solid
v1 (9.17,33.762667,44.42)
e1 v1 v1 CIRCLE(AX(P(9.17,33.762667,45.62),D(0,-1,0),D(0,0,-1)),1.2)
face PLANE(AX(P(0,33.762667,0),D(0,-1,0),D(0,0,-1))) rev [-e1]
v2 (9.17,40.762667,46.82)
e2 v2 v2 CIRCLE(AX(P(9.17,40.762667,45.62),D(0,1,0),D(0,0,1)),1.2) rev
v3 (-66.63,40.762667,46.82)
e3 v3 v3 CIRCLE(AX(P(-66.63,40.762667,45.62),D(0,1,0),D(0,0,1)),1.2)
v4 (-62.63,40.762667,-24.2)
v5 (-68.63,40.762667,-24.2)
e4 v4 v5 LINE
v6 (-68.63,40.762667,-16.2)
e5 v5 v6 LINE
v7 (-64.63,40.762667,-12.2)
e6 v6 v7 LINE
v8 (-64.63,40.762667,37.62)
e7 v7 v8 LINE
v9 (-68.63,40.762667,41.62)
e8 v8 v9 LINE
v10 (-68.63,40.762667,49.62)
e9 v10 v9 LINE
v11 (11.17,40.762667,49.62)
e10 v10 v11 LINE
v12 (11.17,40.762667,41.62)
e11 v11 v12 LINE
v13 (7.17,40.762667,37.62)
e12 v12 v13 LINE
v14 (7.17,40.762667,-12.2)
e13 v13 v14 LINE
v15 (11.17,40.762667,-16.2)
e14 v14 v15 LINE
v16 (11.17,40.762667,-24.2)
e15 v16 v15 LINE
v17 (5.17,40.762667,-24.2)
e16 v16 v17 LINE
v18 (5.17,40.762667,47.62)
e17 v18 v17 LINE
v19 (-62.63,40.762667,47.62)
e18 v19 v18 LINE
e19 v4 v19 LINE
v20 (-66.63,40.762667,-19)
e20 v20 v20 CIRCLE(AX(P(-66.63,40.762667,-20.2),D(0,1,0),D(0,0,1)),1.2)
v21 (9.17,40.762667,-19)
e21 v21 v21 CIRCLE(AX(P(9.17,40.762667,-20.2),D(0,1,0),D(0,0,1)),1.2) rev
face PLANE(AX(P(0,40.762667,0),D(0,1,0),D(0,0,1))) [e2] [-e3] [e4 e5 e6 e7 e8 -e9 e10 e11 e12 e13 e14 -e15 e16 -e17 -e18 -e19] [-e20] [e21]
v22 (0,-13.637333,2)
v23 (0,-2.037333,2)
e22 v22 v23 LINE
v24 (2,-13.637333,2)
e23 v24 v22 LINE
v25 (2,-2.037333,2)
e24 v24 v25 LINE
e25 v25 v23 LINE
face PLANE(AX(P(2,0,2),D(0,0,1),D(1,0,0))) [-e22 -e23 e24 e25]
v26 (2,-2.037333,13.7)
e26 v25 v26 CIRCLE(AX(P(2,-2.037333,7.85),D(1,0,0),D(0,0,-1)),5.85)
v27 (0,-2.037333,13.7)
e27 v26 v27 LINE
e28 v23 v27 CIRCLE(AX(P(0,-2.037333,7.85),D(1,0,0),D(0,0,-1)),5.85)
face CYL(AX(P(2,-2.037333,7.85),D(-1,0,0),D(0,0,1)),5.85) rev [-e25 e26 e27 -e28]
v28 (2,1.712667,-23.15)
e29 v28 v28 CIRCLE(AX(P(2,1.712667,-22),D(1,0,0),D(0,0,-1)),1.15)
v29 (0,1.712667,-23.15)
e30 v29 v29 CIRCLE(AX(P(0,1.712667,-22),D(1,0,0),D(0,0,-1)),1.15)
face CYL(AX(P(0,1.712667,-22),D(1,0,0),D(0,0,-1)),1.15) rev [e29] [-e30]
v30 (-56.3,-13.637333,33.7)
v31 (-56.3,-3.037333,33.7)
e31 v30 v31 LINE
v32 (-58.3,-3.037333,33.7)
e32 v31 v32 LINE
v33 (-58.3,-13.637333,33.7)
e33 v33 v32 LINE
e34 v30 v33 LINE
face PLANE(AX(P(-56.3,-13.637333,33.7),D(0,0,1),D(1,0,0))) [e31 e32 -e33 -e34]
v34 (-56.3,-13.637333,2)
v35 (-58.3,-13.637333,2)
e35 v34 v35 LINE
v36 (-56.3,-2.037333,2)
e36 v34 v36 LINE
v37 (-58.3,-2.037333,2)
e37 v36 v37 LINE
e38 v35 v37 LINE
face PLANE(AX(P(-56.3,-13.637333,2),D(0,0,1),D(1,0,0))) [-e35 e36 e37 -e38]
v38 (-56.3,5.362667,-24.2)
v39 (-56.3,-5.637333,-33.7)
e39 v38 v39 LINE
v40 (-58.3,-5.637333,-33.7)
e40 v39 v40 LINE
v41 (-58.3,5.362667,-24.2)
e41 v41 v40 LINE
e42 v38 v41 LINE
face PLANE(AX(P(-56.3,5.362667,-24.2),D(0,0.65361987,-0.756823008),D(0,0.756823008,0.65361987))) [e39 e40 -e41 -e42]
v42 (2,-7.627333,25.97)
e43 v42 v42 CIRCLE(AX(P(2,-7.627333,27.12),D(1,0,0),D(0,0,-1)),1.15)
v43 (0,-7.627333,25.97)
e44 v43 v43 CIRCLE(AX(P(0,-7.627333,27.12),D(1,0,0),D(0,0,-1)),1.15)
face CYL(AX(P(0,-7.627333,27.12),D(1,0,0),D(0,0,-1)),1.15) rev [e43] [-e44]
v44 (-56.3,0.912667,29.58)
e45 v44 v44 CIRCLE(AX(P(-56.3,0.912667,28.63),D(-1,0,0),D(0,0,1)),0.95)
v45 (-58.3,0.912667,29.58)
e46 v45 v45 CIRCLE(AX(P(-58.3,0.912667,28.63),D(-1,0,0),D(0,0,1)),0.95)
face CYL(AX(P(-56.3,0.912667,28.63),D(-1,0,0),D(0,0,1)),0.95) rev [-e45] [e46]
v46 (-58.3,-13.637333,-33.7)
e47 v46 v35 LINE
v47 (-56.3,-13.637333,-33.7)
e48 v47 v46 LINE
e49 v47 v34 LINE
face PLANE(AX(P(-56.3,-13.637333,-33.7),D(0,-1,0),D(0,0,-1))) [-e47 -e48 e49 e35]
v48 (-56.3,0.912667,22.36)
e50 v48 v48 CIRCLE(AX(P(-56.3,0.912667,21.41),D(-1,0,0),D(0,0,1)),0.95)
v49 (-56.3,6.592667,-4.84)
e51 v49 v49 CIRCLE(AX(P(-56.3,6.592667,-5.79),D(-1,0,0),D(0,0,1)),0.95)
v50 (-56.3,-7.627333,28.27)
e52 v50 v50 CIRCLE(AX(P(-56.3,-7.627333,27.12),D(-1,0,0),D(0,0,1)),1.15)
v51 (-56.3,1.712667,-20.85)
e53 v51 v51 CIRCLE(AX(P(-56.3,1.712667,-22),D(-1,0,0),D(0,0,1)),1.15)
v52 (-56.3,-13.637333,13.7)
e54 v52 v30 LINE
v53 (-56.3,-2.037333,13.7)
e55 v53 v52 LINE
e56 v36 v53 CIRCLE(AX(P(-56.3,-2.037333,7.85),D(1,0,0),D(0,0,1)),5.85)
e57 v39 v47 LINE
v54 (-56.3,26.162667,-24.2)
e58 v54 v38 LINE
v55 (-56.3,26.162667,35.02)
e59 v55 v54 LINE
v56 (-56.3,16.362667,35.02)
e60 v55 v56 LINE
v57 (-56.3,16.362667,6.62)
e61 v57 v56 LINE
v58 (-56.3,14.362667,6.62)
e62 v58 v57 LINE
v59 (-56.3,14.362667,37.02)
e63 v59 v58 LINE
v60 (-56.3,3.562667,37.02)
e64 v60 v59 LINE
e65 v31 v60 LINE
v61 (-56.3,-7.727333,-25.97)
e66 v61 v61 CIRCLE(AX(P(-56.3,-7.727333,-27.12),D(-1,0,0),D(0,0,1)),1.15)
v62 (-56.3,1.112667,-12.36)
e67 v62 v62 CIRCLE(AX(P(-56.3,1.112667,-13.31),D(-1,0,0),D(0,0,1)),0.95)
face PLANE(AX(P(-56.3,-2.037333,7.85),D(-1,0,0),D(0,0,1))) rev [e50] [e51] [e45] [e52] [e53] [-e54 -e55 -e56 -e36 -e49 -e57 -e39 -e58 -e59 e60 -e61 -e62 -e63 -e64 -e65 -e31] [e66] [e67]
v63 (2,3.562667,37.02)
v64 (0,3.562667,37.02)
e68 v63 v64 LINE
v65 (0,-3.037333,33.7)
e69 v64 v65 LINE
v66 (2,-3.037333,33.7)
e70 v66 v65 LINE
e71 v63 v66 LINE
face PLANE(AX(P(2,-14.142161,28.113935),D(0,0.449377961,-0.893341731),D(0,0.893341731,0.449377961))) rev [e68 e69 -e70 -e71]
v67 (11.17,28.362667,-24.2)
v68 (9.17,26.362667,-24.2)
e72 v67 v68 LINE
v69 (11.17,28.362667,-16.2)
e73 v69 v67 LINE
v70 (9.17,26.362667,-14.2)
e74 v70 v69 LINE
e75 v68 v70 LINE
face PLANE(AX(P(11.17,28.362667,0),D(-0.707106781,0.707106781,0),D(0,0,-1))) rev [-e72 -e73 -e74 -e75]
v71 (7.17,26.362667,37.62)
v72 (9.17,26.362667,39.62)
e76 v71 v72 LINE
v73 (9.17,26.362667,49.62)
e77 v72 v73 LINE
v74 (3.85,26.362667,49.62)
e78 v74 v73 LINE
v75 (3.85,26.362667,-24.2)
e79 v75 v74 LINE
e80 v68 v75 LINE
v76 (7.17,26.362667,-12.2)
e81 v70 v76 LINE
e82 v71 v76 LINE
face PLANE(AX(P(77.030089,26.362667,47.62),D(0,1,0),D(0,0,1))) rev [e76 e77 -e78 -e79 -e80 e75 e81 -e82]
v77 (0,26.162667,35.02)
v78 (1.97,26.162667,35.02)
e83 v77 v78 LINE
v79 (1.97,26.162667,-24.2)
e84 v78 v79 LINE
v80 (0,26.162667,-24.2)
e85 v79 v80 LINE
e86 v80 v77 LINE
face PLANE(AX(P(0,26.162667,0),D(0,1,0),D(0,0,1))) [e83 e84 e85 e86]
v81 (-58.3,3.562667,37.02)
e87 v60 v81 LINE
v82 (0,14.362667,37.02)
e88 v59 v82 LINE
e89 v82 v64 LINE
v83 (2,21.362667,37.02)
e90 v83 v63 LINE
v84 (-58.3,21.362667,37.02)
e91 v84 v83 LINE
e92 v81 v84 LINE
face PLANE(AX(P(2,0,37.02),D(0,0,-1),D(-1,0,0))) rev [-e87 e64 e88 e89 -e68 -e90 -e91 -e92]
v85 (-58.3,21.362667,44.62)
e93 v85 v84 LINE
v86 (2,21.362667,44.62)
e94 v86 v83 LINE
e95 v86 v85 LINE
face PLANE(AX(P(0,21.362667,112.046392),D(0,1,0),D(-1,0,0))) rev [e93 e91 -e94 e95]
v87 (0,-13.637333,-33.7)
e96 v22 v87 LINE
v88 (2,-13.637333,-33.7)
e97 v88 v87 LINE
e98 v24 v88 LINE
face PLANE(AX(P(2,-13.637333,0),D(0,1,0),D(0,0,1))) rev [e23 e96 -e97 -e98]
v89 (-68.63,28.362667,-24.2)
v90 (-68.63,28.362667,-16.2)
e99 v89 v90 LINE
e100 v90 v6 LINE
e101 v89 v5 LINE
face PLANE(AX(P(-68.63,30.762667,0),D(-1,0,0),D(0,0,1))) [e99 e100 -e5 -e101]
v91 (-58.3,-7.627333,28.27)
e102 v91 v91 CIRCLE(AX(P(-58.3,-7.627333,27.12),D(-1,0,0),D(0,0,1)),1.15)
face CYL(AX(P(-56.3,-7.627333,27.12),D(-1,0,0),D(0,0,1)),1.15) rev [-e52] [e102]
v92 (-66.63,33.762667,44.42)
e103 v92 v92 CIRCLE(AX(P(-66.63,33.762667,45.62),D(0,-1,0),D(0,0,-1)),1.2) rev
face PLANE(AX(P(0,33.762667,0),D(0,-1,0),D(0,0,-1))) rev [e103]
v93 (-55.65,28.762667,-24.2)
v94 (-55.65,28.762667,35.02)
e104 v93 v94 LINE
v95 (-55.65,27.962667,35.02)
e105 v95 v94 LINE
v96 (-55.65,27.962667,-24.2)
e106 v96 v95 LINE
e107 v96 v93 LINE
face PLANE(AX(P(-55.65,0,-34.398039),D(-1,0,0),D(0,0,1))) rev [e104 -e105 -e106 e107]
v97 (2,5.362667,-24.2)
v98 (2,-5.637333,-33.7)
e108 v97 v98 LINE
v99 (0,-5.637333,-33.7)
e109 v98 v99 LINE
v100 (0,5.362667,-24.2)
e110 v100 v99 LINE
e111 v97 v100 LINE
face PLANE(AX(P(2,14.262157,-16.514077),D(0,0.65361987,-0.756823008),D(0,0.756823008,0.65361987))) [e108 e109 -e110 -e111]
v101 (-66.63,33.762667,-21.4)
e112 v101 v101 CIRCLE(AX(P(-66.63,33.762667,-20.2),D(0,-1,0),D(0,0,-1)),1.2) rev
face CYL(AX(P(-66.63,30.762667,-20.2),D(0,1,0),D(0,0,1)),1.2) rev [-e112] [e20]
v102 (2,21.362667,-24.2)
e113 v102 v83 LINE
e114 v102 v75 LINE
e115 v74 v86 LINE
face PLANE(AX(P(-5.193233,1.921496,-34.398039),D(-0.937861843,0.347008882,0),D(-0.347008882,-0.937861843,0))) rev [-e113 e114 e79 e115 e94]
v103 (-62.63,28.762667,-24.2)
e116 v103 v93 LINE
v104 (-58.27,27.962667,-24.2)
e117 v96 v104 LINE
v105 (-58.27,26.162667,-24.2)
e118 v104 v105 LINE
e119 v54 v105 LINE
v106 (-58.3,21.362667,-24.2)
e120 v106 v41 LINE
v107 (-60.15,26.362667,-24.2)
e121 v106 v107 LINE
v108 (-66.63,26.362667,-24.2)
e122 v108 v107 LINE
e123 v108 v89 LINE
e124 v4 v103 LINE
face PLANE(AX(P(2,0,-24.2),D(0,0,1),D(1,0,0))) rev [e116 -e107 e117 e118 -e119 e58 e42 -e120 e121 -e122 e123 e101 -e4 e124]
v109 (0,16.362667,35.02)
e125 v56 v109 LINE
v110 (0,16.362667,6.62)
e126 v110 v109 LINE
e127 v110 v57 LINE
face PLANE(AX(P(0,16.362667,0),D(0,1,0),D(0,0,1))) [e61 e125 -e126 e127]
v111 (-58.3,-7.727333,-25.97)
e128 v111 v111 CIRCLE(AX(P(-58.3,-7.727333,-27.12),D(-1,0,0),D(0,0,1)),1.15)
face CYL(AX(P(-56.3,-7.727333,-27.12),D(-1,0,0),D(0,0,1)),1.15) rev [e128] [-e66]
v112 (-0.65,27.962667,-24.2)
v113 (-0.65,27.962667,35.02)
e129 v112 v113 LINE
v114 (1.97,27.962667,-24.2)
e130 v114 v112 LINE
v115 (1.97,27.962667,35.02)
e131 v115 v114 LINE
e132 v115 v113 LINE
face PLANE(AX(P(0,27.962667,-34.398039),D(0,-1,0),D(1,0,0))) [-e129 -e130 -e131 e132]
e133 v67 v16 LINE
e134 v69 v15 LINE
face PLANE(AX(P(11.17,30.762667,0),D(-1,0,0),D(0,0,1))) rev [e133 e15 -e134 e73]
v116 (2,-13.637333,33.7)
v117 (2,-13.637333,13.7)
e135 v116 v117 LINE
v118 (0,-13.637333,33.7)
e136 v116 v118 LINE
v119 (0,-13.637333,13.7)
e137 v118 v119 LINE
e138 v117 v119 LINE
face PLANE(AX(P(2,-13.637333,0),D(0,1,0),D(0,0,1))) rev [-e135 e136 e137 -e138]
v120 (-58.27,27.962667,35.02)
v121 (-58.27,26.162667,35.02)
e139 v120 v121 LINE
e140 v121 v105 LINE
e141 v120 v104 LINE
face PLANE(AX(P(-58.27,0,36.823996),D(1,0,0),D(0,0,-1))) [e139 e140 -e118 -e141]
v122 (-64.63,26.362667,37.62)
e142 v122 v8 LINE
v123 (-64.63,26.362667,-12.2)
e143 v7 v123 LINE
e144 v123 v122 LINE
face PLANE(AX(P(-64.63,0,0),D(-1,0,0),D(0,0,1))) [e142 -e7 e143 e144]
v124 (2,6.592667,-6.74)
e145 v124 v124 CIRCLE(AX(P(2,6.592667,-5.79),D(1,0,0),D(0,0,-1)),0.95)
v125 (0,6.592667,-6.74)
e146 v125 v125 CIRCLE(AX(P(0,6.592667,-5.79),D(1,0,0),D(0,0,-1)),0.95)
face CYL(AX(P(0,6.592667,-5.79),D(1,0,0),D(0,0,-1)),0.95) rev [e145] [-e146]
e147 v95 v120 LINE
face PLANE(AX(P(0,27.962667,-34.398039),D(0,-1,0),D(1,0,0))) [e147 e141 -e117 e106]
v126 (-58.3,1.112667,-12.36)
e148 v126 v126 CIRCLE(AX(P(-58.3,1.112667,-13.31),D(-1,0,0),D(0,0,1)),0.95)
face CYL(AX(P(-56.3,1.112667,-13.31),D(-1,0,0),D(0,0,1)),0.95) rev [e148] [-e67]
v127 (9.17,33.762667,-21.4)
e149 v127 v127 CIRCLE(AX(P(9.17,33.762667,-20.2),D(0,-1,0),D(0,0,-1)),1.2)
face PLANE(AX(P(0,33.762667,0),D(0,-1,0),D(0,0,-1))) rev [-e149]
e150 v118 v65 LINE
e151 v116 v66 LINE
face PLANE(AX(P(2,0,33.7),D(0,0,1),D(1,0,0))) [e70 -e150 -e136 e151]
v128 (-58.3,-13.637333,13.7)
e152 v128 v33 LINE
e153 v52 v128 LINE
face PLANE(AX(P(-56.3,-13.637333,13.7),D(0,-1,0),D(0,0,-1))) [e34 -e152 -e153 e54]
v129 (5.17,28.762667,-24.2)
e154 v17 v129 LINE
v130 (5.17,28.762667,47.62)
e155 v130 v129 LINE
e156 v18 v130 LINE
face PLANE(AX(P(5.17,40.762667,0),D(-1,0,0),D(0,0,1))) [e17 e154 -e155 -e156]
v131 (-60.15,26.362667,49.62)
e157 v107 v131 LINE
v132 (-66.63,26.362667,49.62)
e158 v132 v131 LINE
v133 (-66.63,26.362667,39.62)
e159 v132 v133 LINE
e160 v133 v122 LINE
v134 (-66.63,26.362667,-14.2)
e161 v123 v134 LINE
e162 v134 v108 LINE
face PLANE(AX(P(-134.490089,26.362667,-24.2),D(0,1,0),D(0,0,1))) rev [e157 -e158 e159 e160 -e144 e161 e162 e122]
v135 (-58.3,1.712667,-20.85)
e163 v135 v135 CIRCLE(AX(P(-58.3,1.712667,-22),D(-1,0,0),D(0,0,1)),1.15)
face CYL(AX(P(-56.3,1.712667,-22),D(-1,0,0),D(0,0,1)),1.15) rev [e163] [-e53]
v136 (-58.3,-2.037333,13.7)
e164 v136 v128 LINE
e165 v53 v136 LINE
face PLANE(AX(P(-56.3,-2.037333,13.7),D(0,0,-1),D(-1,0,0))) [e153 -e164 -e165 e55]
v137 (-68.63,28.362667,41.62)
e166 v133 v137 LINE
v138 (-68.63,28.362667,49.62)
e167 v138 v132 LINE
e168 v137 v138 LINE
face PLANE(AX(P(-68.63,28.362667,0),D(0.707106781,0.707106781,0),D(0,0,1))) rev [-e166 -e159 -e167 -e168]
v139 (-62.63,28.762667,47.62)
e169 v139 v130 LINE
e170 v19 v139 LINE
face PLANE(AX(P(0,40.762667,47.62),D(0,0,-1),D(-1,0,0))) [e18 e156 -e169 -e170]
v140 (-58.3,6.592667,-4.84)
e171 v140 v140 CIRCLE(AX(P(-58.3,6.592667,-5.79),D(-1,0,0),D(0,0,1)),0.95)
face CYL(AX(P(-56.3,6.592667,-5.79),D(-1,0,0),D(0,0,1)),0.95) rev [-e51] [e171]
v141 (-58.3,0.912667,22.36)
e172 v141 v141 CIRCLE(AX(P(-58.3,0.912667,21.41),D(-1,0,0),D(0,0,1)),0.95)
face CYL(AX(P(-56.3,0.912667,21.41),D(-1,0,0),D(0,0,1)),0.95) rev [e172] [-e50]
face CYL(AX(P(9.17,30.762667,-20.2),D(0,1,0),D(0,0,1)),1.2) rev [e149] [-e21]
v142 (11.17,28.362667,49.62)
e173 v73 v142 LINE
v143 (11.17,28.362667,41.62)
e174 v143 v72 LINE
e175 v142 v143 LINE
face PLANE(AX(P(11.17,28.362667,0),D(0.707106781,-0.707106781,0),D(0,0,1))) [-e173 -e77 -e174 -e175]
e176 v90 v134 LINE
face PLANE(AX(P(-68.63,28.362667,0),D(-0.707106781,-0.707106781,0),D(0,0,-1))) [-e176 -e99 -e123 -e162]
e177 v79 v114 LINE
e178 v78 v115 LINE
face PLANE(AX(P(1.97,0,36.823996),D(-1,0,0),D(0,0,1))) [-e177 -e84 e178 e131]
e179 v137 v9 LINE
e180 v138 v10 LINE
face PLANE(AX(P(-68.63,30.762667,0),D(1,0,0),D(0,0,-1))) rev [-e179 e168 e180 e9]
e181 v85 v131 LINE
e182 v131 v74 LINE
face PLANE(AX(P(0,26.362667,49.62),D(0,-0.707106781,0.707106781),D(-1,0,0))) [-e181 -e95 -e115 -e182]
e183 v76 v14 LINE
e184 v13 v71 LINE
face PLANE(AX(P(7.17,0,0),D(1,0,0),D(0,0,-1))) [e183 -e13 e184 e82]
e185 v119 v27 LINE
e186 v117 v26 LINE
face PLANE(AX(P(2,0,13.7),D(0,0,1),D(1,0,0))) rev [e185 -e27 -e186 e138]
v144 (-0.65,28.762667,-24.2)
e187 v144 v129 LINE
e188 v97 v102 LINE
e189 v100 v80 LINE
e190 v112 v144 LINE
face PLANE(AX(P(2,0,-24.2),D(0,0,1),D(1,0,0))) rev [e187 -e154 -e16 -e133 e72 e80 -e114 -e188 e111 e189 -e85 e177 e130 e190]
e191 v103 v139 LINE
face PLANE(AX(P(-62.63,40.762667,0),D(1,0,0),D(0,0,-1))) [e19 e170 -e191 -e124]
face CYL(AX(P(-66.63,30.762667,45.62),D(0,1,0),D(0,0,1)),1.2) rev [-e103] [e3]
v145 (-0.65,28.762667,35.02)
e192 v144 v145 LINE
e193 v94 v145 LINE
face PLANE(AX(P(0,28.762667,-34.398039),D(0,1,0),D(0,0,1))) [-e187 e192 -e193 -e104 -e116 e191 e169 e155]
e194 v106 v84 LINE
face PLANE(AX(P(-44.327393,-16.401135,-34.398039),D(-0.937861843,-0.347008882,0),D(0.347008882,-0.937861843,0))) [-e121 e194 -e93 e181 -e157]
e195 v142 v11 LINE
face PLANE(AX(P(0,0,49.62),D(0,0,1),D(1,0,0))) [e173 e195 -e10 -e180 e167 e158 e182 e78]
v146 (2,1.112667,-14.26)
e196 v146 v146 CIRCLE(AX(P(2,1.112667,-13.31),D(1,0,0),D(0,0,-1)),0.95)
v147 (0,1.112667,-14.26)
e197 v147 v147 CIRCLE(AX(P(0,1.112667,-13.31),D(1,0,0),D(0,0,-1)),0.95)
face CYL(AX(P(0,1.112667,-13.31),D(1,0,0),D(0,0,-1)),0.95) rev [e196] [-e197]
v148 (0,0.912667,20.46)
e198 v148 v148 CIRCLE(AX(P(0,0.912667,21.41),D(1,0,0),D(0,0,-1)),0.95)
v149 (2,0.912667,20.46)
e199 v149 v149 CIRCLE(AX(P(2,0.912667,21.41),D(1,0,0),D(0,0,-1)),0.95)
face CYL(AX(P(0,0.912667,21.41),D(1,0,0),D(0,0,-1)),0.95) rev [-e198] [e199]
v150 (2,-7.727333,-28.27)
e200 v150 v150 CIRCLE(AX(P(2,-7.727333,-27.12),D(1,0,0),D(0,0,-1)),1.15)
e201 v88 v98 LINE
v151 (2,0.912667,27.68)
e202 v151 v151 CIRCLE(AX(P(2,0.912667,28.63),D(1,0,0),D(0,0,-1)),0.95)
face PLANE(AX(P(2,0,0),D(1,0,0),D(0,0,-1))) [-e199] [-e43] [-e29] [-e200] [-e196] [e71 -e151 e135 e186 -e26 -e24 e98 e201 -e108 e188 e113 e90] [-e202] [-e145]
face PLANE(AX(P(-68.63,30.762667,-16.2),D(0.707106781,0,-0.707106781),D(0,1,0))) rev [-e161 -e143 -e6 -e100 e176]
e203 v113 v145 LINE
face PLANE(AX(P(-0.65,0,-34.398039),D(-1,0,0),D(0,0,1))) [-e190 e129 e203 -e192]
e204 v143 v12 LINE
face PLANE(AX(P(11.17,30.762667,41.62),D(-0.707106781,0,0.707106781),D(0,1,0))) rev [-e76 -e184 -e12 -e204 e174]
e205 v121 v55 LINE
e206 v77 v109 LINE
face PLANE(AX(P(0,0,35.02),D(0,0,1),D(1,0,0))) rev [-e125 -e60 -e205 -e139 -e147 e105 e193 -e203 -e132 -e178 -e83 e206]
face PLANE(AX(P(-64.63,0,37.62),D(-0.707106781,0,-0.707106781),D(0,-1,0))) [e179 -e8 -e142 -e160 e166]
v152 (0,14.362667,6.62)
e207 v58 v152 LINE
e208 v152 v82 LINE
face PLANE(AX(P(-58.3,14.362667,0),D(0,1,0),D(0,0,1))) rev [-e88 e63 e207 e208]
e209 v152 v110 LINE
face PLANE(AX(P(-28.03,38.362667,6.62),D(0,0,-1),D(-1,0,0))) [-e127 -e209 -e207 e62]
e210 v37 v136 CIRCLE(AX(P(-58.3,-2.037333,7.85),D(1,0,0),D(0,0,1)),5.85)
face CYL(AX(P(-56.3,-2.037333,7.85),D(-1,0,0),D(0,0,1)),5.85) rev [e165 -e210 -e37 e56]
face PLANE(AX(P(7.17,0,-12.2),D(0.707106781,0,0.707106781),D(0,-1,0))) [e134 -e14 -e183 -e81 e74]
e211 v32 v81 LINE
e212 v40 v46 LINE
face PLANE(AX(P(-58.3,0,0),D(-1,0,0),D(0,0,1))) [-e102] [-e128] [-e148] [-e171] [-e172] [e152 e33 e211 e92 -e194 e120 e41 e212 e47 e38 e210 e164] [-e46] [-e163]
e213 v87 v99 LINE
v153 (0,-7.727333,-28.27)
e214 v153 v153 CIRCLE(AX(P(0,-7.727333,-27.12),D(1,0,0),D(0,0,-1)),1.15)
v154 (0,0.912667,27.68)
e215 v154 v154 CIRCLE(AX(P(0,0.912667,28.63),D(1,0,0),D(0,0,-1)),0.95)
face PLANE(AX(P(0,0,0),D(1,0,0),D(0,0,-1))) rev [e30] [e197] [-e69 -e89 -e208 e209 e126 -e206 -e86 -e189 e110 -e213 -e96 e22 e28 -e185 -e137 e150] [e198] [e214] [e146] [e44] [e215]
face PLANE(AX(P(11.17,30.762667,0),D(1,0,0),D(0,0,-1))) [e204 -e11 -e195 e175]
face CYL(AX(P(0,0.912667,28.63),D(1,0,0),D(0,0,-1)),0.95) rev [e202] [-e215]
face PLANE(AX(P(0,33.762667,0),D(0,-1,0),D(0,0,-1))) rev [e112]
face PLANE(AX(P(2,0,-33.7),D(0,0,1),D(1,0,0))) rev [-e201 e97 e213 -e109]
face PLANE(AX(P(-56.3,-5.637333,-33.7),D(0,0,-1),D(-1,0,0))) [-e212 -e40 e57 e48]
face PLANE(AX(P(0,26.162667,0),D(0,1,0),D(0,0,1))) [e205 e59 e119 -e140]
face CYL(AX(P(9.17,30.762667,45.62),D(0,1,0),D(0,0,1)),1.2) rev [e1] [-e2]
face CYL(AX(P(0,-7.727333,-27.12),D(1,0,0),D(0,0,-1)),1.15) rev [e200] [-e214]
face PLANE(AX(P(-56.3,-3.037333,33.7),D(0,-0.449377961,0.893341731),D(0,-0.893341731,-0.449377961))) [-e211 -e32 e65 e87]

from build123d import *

# Parameters (mm, degrees)
SKETCH_1_W          = 9.5
SKETCH_1_H          = 8
EXTRUDE_1_DEPTH     = 2
SKETCH_2_R          = 1.15
SKETCH_2_R_2        = 0.95
CUT_EXTRUDE_1_DEPTH = 40.502623296
SKETCH_3_W          = 2
SKETCH_3_H          = 61.22
EXTRUDE_2_DEPTH     = 6
SKETCH_4_W          = 61.22
SKETCH_4_H          = 2
EXTRUDE_3_DEPTH     = 58.3
EXTRUDE_START       = -2
SKETCH_5_R          = 0.95
SKETCH_5_R_2        = 1.15
EXTRUDE_4_DEPTH     = 2
EXTRUDE_5_DEPTH     = 61.22
EXTRUDE_6_DEPTH     = 2
SKETCH_10_W         = 1.85
SKETCH_10_H         = 59.22
CUT_EXTRUDE_2_DEPTH = 0.2
SKETCH_11_W         = 0.12
SKETCH_11_H         = 1.8
CUT_EXTRUDE_4_DEPTH = 59.22
CUT_EXTRUDE_START   = -30.82
SKETCH_12_W         = 56.3
SKETCH_12_H         = 2
CUT_EXTRUDE_5_DEPTH = 30.82
EXTRUDE_7_DEPTH     = 10.6
SKETCH_14_W         = 71.82
SKETCH_14_H         = 2.4
EXTRUDE_8_DEPTH     = 1.32
SKETCH_15_W         = 71.82
SKETCH_15_H         = 2.4
EXTRUDE_9_DEPTH     = 2.48
EXTRUDE_10_DEPTH    = 2
SKETCH_17_W         = 73.82
SKETCH_17_H         = 2.4
EXTRUDE_11_DEPTH    = 2
SKETCH_18_W         = 73.82
SKETCH_18_H         = 2.4
EXTRUDE_12_DEPTH    = 2
EXTRUDE_13_DEPTH    = 12
SKETCH_20_W         = 4
SKETCH_20_H         = 8
SKETCH_20_R         = 1.2
EXTRUDE_14_DEPTH    = 10
SKETCH_21_W         = 4
SKETCH_21_H         = 8
EXTRUDE_15_DEPTH    = 3
SKETCH_22_W         = 4
SKETCH_22_H         = 8
EXTRUDE_16_DEPTH    = 4.4
CHAMFER_1_SIZE      = 4
CHAMFER_2_SIZE      = 2
CHAMFER_3_SIZE      = 5


with BuildPart() as part:
    # 草图1 → 凸台-拉伸1 (new body)
    with BuildSketch(Plane(origin=(0, 0, 0), x_dir=(0, 0, -1), z_dir=(1, 0, 0))):
        with BuildLine():
            Line((-2, -13.637332849), (24.2, -13.637332849))
            Line((24.2, -13.637332849), (24.2, -5.637332849))
            Line((24.2, -5.637332849), (24.2, 5.362667151))
            Line((24.2, 5.362667151), (24.2, 10.362667151))
            Line((24.2, 10.362667151), (-37.02, 10.362667151))
            Line((-37.02, 10.362667151), (-37.02, 3.562667151))
            Line((-37.02, 3.562667151), (-33.7, -3.037332849))
            Line((-33.7, -3.037332849), (-33.7, -13.637332849))
            Line((-33.7, -13.637332849), (-13.7, -13.637332849))
            Line((-13.7, -13.637332849), (-13.7, -2.037332849))
            ThreePointArc((-13.7, -2.037332849), (-7.85, 3.812667151), (-2, -2.037332849))
            Line((-2, -2.037332849), (-2, -13.637332849))
        make_face()
        Polygon((24.2, -5.637332849), (33.7, -5.637332849), (24.2, 5.362667151), align=None)
        with Locations((28.95, -9.637332849)):
            Rectangle(SKETCH_1_W, SKETCH_1_H)
    extrude(amount=EXTRUDE_1_DEPTH)

    # 草图2 → 切除-拉伸1 (cut, through all)
    with BuildSketch(Plane(origin=(2, 0, 0), x_dir=(0, 0, -1), z_dir=(1, 0, 0))):
        with Locations((27.12, -7.727332849)):
            Circle(SKETCH_2_R)
        with Locations((-27.12, -7.627332849)):
            Circle(SKETCH_2_R)
        with Locations((22, 1.712667151)):
            Circle(SKETCH_2_R)
        with Locations((13.31, 1.112667151)):
            Circle(SKETCH_2_R_2)
        with Locations((5.79, 6.592667151)):
            Circle(SKETCH_2_R_2)
        with Locations((-21.41, 0.912667151)):
            Circle(SKETCH_2_R_2)
        with Locations((-28.63, 0.912667151)):
            Circle(SKETCH_2_R_2)
    extrude(amount=-CUT_EXTRUDE_1_DEPTH, mode=Mode.SUBTRACT)

    # 草图3 → 凸台-拉伸2 (add)
    with BuildSketch(Plane(origin=(0, 10.362667151, 0), x_dir=(1, 0, 0), z_dir=(0, 1, 0))):
        with Locations((1, -6.41)):
            Rectangle(SKETCH_3_W, SKETCH_3_H)
    extrude(amount=EXTRUDE_2_DEPTH)

    # 草图4 → 凸台-拉伸3 (add)
    with BuildSketch(Plane.ZY):
        with Locations((6.41, 15.362667151)):
            Rectangle(SKETCH_4_W, SKETCH_4_H)
    extrude(amount=EXTRUDE_3_DEPTH)

    # 草图5 → 凸台-拉伸4 (add)
    with BuildSketch(Plane.ZY.offset(58.3).offset(EXTRUDE_START)):
        with BuildLine():
            Line((37.02, 14.362667151), (-24.2, 14.362667151))
            Line((-24.2, 14.362667151), (-24.2, 5.362667151))
            Line((-24.2, 5.362667151), (-33.7, -5.637332849))
            Line((-33.7, -5.637332849), (-33.7, -13.637332849))
            Line((-33.7, -13.637332849), (2, -13.637332849))
            Line((2, -13.637332849), (2, -2.037332849))
            ThreePointArc((2, -2.037332849), (7.85, 3.812667151), (13.7, -2.037332849))
            Line((13.7, -2.037332849), (13.7, -13.637332849))
            Line((13.7, -13.637332849), (33.7, -13.637332849))
            Line((33.7, -13.637332849), (33.7, -3.037332849))
            Line((33.7, -3.037332849), (37.02, 3.562667151))
            Line((37.02, 3.562667151), (37.02, 14.362667151))
        make_face()
        with Locations(Location((-13.31, 1.112667151, 0), (0, 0, 180))):
            Circle(SKETCH_5_R, mode=Mode.SUBTRACT)
        with Locations(Location((-22, 1.712667151, 0), (0, 0, 180))):
            Circle(SKETCH_5_R_2, mode=Mode.SUBTRACT)
        with Locations(Location((-27.12, -7.727332849, 0), (0, 0, 180))):
            Circle(SKETCH_5_R_2, mode=Mode.SUBTRACT)
        with Locations(Location((-5.79, 6.592667151, 0), (0, 0, 180))):
            Circle(SKETCH_5_R, mode=Mode.SUBTRACT)
        with Locations(Location((21.41, 0.912667151, 0), (0, 0, 180))):
            Circle(SKETCH_5_R, mode=Mode.SUBTRACT)
        with Locations(Location((28.63, 0.912667151, 0), (0, 0, 180))):
            Circle(SKETCH_5_R, mode=Mode.SUBTRACT)
        with Locations(Location((27.12, -7.627332849, 0), (0, 0, 180))):
            Circle(SKETCH_5_R_2, mode=Mode.SUBTRACT)
    extrude(amount=EXTRUDE_4_DEPTH)

    # 草图7 → 凸台-拉伸5 (add)
    with BuildSketch(Plane.XY.offset(37.02)):
        Polygon((-58.3, 21.362667151), (-58.3, 16.362667151), (-56.3, 16.362667151), (-56.3, 26.362667151), (-58.15, 26.362667151), (-58.15, 27.962667151), (-55.65, 27.962667151), (-55.65, 28.762667151), (-60.15, 28.762667151), (-60.15, 26.362667151), align=None)
        Polygon((0, 26.362667151), (0, 16.362667151), (2, 16.362667151), (2, 21.362667151), (3.85, 26.362667151), (3.85, 28.762667151), (-0.65, 28.762667151), (-0.65, 27.962667151), (1.85, 27.962667151), (1.85, 26.362667151), align=None)
    extrude(amount=-EXTRUDE_5_DEPTH)

    # 草图8 → 凸台-拉伸6 (add)
    with BuildSketch(Plane.XY.offset(37.02)):
        Polygon((-55.65, 28.762667151), (-0.65, 28.762667151), (-0.65, 27.962667151), (1.85, 27.962667151), (1.85, 26.362667151), (0, 26.362667151), (0, 16.362667151), (-56.3, 16.362667151), (-56.3, 26.362667151), (-58.15, 26.362667151), (-58.15, 27.962667151), (-55.65, 27.962667151), align=None)
        Polygon((0, 26.362667151), (0, 16.362667151), (-56.3, 16.362667151), (-56.3, 26.362667151), (-58.15, 26.362667151), (-58.15, 27.962667151), (-55.65, 27.962667151), (-55.65, 28.762667151), (-60.15, 28.762667151), (-60.15, 26.362667151), (-58.3, 21.362667151), (-58.3, 3.562667151), (-56.3, 3.562667151), (-56.3, 14.362667151), (0, 14.362667151), (0, 3.562667151), (2, 3.562667151), (2, 21.362667151), (3.85, 26.362667151), (3.85, 28.762667151), (-0.65, 28.762667151), (-0.65, 27.962667151), (1.85, 27.962667151), (1.85, 26.362667151), align=None)
    extrude(amount=-EXTRUDE_6_DEPTH)

    # 草图10 → 切除-拉伸2 (cut)
    with BuildSketch(Plane(origin=(0, 26.362667151, 0), x_dir=(1, 0, 0), z_dir=(0, 1, 0))):
        with Locations((0.925, -5.41)):
            Rectangle(SKETCH_10_W, SKETCH_10_H)
        with Locations((-57.225, -5.41)):
            Rectangle(SKETCH_10_W, SKETCH_10_H)
    extrude(amount=-CUT_EXTRUDE_2_DEPTH, mode=Mode.SUBTRACT)

    # 草图11 → 切除-拉伸4 (cut)
    with BuildSketch(Plane(origin=(0, 0, -24.2), x_dir=(-1, 0, 0), z_dir=(0, 0, -1))):
        with Locations((-1.91, 27.062667151)):
            Rectangle(SKETCH_11_W, SKETCH_11_H)
        with Locations((58.21, 27.062667151)):
            Rectangle(SKETCH_11_W, SKETCH_11_H)
    extrude(amount=-CUT_EXTRUDE_4_DEPTH, mode=Mode.SUBTRACT)

    # 草图12 → 切除-拉伸5 (cut)
    with BuildSketch(Plane(origin=(0, 0, -24.2), x_dir=(-1, 0, 0), z_dir=(0, 0, -1)).offset(CUT_EXTRUDE_START)):
        with Locations((28.15, 15.362667151)):
            Rectangle(SKETCH_12_W, SKETCH_12_H)
    extrude(amount=CUT_EXTRUDE_5_DEPTH, mode=Mode.SUBTRACT)

    # 草图13 → 凸台-拉伸7 (add)
    with BuildSketch(Plane.XY.offset(37.02)):
        Polygon((-58.3, 21.362667151), (2, 21.362667151), (3.85, 26.362667151), (3.85, 28.762667151), (-60.15, 28.762667151), (-60.15, 26.362667151), align=None)
    extrude(amount=EXTRUDE_7_DEPTH)

    # 草图14 → 凸台-拉伸8 (add)
    with BuildSketch(Plane(origin=(3.85, 0, 0), x_dir=(0, 0, -1), z_dir=(1, 0, 0))):
        with Locations((-11.71, 27.562667151)):
            Rectangle(SKETCH_14_W, SKETCH_14_H)
    extrude(amount=EXTRUDE_8_DEPTH)

    # 草图15 → 凸台-拉伸9 (add)
    with BuildSketch(Plane.ZY.offset(60.15)):
        with Locations((11.71, 27.562667151)):
            Rectangle(SKETCH_15_W, SKETCH_15_H)
    extrude(amount=EXTRUDE_9_DEPTH)

    # 草图16 → 凸台-拉伸10 (add)
    with BuildSketch(Plane.XY.offset(47.62)):
        Polygon((-58.3, 21.362667151), (2, 21.362667151), (3.85, 26.362667151), (5.17, 26.362667151), (5.17, 28.762667151), (-62.63, 28.762667151), (-62.63, 26.362667151), (-60.15, 26.362667151), align=None)
    extrude(amount=EXTRUDE_10_DEPTH)

    # 草图17 → 凸台-拉伸11 (add)
    with BuildSketch(Plane(origin=(5.17, 0, 0), x_dir=(0, 0, -1), z_dir=(1, 0, 0))):
        with Locations((-12.71, 27.562667151)):
            Rectangle(SKETCH_17_W, SKETCH_17_H)
    extrude(amount=EXTRUDE_11_DEPTH)

    # 草图18 → 凸台-拉伸12 (add)
    with BuildSketch(Plane.ZY.offset(62.63)):
        with Locations((12.71, 27.562667151)):
            Rectangle(SKETCH_18_W, SKETCH_18_H)
    extrude(amount=EXTRUDE_12_DEPTH)

    # 草图19 → 凸台-拉伸13 (add)
    with BuildSketch(Plane(origin=(0, 28.762667151, 0), x_dir=(1, 0, 0), z_dir=(0, 1, 0))):
        Polygon((-62.63, -47.62), (-62.63, 22.2), (-62.63, 24.2), (-64.63, 24.2), (-64.63, -49.62), (7.17, -49.62), (7.17, 24.2), (5.17, 24.2), (5.17, 22.2), (5.17, -47.62), align=None)
    extrude(amount=EXTRUDE_13_DEPTH)

    # 草图20 → 凸台-拉伸14 (add)
    # profile 1 of 4: a face of its own
    with BuildSketch(Plane(origin=(0, 40.762667151, 0), x_dir=(1, 0, 0), z_dir=(0, 1, 0))):
        with Locations((-66.63, -45.62)):
            Rectangle(SKETCH_20_W, SKETCH_20_H)
        with Locations(Location((-66.63, -45.62, 0), (0, 0, 270))):
            Circle(SKETCH_20_R, mode=Mode.SUBTRACT)
    # profile 2 of 4: a face of its own
    with BuildSketch(Plane(origin=(0, 40.762667151, 0), x_dir=(1, 0, 0), z_dir=(0, 1, 0))):
        with Locations((9.17, -45.62)):
            Rectangle(SKETCH_20_W, SKETCH_20_H)
        with Locations(Location((9.17, -45.62, 0), (0, 0, 270))):
            Circle(SKETCH_20_R, mode=Mode.SUBTRACT)
    # profile 3 of 4: a face of its own
    with BuildSketch(Plane(origin=(0, 40.762667151, 0), x_dir=(1, 0, 0), z_dir=(0, 1, 0))):
        with Locations((-66.63, 20.2)):
            Rectangle(SKETCH_20_W, SKETCH_20_H)
        with Locations(Location((-66.63, 20.2, 0), (0, 0, 270))):
            Circle(SKETCH_20_R, mode=Mode.SUBTRACT)
    # profile 4 of 4: a face of its own
    with BuildSketch(Plane(origin=(0, 40.762667151, 0), x_dir=(1, 0, 0), z_dir=(0, 1, 0))):
        with Locations((9.17, 20.2)):
            Rectangle(SKETCH_20_W, SKETCH_20_H)
        with Locations(Location((9.17, 20.2, 0), (0, 0, 270))):
            Circle(SKETCH_20_R, mode=Mode.SUBTRACT)
    extrude(amount=-EXTRUDE_14_DEPTH)

    # 草图21 → 凸台-拉伸15 (add)
    with BuildSketch(Plane.XZ.offset(-30.762667151)):
        with Locations((-66.63, -20.2)):
            Rectangle(SKETCH_21_W, SKETCH_21_H)
        with Locations((-66.63, 45.62)):
            Rectangle(SKETCH_21_W, SKETCH_21_H)
        with Locations((9.17, -20.2)):
            Rectangle(SKETCH_21_W, SKETCH_21_H)
        with Locations((9.17, 45.62)):
            Rectangle(SKETCH_21_W, SKETCH_21_H)
    extrude(amount=-EXTRUDE_15_DEPTH)

    # 草图22 → 凸台-拉伸16 (add)
    with BuildSketch(Plane.XZ.offset(-30.762667151)):
        with Locations((-66.63, 45.62)):
            Rectangle(SKETCH_22_W, SKETCH_22_H)
        with Locations((-66.63, -20.2)):
            Rectangle(SKETCH_22_W, SKETCH_22_H)
        with Locations((9.17, -20.2)):
            Rectangle(SKETCH_22_W, SKETCH_22_H)
        with Locations((9.17, 45.62)):
            Rectangle(SKETCH_22_W, SKETCH_22_H)
    extrude(amount=EXTRUDE_16_DEPTH)

    # 倒角1
    chamfer_1_edges = [part.edges().sort_by_distance(p)[0] for p in [
        (-64.63, 33.562667151, 41.62),
        (7.17, 33.562667151, 41.62),
        (-64.63, 33.562667151, -16.2),
        (7.17, 33.562667151, -16.2),
    ]]
    chamfer(chamfer_1_edges, length=CHAMFER_1_SIZE - 0.0001)  # a hair under: the kernel refuses the full size

    # 倒角2
    chamfer_2_edges = [part.edges().sort_by_distance(p)[0] for p in [
        (-68.63, 26.362667151, 45.62),
        (-68.63, 26.362667151, -20.2),
        (11.17, 26.362667151, -20.2),
        (11.17, 26.362667151, 45.62),
    ]]
    chamfer(chamfer_2_edges, length=CHAMFER_2_SIZE)

    # 倒角3
    chamfer_3_edges = [part.edges().sort_by_distance(p)[0] for p in [
        (-28.15, 21.362667151, 49.62),
    ]]
    chamfer(chamfer_3_edges, length=CHAMFER_3_SIZE)


solid = part.part
